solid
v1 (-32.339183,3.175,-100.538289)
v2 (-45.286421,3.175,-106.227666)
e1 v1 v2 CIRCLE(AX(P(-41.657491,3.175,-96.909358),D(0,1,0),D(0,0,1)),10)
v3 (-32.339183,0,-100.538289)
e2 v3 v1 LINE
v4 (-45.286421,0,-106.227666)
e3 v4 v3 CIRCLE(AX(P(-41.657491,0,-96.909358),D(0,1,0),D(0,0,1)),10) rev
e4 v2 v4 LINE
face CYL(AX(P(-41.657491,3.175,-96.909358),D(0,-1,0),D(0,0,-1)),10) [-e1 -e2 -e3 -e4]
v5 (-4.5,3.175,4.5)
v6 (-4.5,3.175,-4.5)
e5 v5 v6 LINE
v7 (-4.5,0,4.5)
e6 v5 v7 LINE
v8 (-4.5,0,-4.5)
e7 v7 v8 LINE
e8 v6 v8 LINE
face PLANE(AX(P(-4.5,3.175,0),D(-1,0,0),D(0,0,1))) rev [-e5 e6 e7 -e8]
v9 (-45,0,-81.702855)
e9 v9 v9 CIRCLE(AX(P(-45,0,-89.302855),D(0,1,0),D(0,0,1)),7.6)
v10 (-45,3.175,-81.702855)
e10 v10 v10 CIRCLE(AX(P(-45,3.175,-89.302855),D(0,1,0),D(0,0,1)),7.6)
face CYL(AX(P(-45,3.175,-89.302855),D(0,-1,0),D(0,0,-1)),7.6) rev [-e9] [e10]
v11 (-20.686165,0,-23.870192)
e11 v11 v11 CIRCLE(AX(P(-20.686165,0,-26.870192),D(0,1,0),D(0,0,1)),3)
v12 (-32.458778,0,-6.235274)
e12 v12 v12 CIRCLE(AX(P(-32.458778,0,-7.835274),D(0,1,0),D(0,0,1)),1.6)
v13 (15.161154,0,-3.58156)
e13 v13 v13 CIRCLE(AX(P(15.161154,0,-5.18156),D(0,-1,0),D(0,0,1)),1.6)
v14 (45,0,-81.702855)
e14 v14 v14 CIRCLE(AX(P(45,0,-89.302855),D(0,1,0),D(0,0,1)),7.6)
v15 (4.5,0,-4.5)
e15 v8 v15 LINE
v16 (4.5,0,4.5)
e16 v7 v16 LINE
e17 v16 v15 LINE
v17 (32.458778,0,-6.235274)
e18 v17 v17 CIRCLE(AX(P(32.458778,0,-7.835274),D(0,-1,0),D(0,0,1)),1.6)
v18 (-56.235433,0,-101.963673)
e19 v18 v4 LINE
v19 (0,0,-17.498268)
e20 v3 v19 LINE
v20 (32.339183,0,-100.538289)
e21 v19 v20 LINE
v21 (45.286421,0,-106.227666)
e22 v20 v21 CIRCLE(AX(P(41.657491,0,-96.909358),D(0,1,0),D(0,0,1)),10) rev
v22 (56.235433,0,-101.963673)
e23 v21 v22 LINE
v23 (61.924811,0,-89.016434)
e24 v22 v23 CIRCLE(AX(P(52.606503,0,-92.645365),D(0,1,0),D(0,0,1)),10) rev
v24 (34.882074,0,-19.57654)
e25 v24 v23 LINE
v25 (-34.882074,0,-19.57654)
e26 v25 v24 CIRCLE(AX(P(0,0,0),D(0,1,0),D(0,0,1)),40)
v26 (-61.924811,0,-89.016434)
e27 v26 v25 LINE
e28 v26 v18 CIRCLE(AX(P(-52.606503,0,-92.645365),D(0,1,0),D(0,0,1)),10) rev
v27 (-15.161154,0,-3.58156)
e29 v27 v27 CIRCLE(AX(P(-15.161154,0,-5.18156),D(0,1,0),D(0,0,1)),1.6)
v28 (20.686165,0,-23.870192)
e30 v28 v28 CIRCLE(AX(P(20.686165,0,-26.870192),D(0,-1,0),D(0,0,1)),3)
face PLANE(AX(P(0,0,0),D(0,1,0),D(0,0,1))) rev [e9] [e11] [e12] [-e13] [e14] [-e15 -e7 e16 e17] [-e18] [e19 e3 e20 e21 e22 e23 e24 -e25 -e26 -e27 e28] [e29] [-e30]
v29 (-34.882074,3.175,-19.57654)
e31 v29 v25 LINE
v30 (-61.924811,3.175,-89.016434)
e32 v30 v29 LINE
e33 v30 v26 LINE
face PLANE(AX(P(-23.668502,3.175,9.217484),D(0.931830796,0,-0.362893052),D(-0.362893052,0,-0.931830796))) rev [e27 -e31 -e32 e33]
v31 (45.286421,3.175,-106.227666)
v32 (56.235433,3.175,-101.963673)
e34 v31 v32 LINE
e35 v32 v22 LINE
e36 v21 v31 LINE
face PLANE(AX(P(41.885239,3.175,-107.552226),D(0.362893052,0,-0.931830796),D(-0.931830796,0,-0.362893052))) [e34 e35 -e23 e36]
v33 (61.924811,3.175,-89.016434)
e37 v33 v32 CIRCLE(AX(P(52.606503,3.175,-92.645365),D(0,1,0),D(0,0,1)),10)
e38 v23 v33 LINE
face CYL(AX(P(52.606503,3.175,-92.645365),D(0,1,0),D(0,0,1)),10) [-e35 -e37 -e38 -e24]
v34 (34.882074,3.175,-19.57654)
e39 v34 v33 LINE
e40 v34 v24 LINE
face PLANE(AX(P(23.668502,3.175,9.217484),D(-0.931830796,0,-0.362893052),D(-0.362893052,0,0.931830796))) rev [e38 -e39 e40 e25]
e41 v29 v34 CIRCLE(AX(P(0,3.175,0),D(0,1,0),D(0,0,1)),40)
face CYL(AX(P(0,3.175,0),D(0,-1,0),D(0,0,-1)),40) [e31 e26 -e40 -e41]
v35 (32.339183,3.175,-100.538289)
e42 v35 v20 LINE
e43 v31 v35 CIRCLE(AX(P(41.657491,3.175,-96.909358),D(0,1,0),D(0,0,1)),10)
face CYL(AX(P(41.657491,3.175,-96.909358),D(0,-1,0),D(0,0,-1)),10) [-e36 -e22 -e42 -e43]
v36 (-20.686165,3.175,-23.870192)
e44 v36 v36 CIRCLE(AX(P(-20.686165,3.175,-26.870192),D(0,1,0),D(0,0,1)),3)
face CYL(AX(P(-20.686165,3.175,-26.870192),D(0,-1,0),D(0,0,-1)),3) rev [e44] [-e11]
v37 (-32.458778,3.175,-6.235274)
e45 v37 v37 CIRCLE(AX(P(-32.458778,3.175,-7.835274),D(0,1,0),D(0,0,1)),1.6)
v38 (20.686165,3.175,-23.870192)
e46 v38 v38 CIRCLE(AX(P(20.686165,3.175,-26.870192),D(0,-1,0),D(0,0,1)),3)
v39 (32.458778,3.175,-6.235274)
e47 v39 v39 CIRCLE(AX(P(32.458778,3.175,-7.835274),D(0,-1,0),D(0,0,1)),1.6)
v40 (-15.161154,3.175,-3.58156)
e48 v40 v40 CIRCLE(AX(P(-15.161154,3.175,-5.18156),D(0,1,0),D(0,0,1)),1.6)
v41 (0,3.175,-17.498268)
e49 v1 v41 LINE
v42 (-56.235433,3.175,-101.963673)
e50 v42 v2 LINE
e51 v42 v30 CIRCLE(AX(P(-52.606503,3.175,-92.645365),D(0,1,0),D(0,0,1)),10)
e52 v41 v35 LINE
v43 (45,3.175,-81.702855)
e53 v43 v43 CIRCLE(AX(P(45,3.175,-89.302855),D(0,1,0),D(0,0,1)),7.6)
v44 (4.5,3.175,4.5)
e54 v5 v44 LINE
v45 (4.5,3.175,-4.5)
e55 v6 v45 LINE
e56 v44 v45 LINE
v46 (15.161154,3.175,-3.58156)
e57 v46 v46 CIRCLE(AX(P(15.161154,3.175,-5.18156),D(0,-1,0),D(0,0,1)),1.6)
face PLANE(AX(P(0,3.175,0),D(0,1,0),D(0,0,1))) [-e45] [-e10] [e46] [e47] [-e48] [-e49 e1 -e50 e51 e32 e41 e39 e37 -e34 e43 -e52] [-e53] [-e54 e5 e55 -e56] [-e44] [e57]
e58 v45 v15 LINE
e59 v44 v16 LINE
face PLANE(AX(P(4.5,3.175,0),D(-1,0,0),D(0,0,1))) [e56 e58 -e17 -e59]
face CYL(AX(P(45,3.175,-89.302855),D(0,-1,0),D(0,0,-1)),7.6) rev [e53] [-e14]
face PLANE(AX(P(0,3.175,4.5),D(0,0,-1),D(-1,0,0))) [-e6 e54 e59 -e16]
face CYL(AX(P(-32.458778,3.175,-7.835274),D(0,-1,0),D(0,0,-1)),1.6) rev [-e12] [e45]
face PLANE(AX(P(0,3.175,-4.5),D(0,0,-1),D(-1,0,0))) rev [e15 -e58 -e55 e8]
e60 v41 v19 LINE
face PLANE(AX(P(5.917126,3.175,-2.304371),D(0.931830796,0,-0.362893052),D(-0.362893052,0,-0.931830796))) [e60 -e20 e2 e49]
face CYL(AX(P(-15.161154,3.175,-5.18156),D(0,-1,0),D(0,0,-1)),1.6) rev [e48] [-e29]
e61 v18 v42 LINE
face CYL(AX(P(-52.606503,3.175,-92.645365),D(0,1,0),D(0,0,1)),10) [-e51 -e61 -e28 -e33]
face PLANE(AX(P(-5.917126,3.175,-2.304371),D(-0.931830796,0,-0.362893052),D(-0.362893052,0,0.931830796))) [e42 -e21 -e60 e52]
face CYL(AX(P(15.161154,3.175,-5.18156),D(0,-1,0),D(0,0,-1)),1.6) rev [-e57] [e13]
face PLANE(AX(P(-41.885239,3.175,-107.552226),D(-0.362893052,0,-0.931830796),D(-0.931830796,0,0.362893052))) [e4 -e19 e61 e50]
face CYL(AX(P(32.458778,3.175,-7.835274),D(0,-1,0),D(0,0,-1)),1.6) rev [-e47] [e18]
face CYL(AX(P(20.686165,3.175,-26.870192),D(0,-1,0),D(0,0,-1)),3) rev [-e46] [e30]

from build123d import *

# Parameters (mm, degrees)
SKETCH1_R           = 1.6
SKETCH1_R_2         = 3
SKETCH1_R_3         = 7.6
SKETCH1_W           = 9
SKETCH1_H           = 9
BOSS_EXTRUDE1_DEPTH = 3.175
FILLET1_R           = 10
MIRROR2_OUTLINE_R   = 3
MIRROR2_OUTLINE_R_2 = 1.6
MIRROR2_DEPTH       = 3.175


# Read off the part's stored shape, not the designer's step: Mirror2
with BuildPart() as part:
    # Sketch1 → Boss-Extrude1 (new body)
    # profile 1 of 2: a face of its own
    with BuildSketch(Plane(origin=(0, 0, 0), x_dir=(1, 0, 0), z_dir=(0, 1, 0))):
        with BuildLine():
            ThreePointArc((23.66850222, -9.217483532), (0, -25.4), (-23.66850222, -9.217483532))
            Line((-23.66850222, -9.217483532), (-65.553741095, 98.334742178))
            Line((-65.553741095, 98.334742178), (-35.96811332, 109.856596592))
            Line((-35.96811332, 109.856596592), (0, 17.498268312))
            Line((0, 17.498268312), (35.96811332, 109.856596592))
            Line((35.96811332, 109.856596592), (65.553741095, 98.334742178))
            Line((65.553741095, 98.334742178), (23.66850222, -9.217483532))
        make_face()
        with Locations(Location((-15.161153788, 5.181560445, 0), (0, 0, 270))):
            Circle(SKETCH1_R, mode=Mode.SUBTRACT)
        with Locations(Location((-20.686165487, 26.870192161, 0), (0, 0, 270))):
            Circle(SKETCH1_R_2, mode=Mode.SUBTRACT)
        with Locations(Location((-45, 89.302855497, 0), (0, 0, 270))):
            Circle(SKETCH1_R_3, mode=Mode.SUBTRACT)
        with Locations(Location((45, 89.302855497, 0), (0, 0, 270))):
            Circle(SKETCH1_R_3, mode=Mode.SUBTRACT)
        Rectangle(SKETCH1_W, SKETCH1_H, mode=Mode.SUBTRACT)
    # profile 2 of 2: a face of its own
    with BuildSketch(Plane(origin=(0, 0, 0), x_dir=(1, 0, 0), z_dir=(0, 1, 0))):
        with BuildLine():
            Line((-23.66850222, -9.217483532), (-34.882073701, 19.576540408))
            ThreePointArc((-34.882073701, 19.576540408), (0, -40), (34.882073701, 19.576540408))
            Line((34.882073701, 19.576540408), (23.66850222, -9.217483532))
            ThreePointArc((23.66850222, -9.217483532), (0, -25.4), (-23.66850222, -9.217483532))
        make_face()
        with Locations(Location((-32.458777971, 7.835274371, 0), (0, 0, 270))):
            Circle(SKETCH1_R, mode=Mode.SUBTRACT)
    extrude(amount=BOSS_EXTRUDE1_DEPTH)

    # Fillet1
    fillet1_edges = [part.edges().sort_by_distance(p)[0] for p in [
        (-65.553741095, 1.5875, -98.334742178),
        (-35.96811332, 1.5875, -109.856596592),
        (35.96811332, 1.5875, -109.856596592),
        (65.553741095, 1.5875, -98.334742178),
    ]]
    fillet(fillet1_edges, radius=FILLET1_R)

    # Mirror2 outline → Mirror2 (cut)
    with BuildSketch(Plane(origin=(0, 0, 0), x_dir=(1, 0, 0), z_dir=(0, 1, 0))):
        with Locations((20.686165487, 26.870192161)):
            Circle(MIRROR2_OUTLINE_R)
        with Locations((15.161153788, 5.181560445)):
            Circle(MIRROR2_OUTLINE_R_2)
        with Locations((32.458777971, 7.835274371)):
            Circle(MIRROR2_OUTLINE_R_2)
    extrude(amount=MIRROR2_DEPTH, mode=Mode.SUBTRACT)


solid = part.part
